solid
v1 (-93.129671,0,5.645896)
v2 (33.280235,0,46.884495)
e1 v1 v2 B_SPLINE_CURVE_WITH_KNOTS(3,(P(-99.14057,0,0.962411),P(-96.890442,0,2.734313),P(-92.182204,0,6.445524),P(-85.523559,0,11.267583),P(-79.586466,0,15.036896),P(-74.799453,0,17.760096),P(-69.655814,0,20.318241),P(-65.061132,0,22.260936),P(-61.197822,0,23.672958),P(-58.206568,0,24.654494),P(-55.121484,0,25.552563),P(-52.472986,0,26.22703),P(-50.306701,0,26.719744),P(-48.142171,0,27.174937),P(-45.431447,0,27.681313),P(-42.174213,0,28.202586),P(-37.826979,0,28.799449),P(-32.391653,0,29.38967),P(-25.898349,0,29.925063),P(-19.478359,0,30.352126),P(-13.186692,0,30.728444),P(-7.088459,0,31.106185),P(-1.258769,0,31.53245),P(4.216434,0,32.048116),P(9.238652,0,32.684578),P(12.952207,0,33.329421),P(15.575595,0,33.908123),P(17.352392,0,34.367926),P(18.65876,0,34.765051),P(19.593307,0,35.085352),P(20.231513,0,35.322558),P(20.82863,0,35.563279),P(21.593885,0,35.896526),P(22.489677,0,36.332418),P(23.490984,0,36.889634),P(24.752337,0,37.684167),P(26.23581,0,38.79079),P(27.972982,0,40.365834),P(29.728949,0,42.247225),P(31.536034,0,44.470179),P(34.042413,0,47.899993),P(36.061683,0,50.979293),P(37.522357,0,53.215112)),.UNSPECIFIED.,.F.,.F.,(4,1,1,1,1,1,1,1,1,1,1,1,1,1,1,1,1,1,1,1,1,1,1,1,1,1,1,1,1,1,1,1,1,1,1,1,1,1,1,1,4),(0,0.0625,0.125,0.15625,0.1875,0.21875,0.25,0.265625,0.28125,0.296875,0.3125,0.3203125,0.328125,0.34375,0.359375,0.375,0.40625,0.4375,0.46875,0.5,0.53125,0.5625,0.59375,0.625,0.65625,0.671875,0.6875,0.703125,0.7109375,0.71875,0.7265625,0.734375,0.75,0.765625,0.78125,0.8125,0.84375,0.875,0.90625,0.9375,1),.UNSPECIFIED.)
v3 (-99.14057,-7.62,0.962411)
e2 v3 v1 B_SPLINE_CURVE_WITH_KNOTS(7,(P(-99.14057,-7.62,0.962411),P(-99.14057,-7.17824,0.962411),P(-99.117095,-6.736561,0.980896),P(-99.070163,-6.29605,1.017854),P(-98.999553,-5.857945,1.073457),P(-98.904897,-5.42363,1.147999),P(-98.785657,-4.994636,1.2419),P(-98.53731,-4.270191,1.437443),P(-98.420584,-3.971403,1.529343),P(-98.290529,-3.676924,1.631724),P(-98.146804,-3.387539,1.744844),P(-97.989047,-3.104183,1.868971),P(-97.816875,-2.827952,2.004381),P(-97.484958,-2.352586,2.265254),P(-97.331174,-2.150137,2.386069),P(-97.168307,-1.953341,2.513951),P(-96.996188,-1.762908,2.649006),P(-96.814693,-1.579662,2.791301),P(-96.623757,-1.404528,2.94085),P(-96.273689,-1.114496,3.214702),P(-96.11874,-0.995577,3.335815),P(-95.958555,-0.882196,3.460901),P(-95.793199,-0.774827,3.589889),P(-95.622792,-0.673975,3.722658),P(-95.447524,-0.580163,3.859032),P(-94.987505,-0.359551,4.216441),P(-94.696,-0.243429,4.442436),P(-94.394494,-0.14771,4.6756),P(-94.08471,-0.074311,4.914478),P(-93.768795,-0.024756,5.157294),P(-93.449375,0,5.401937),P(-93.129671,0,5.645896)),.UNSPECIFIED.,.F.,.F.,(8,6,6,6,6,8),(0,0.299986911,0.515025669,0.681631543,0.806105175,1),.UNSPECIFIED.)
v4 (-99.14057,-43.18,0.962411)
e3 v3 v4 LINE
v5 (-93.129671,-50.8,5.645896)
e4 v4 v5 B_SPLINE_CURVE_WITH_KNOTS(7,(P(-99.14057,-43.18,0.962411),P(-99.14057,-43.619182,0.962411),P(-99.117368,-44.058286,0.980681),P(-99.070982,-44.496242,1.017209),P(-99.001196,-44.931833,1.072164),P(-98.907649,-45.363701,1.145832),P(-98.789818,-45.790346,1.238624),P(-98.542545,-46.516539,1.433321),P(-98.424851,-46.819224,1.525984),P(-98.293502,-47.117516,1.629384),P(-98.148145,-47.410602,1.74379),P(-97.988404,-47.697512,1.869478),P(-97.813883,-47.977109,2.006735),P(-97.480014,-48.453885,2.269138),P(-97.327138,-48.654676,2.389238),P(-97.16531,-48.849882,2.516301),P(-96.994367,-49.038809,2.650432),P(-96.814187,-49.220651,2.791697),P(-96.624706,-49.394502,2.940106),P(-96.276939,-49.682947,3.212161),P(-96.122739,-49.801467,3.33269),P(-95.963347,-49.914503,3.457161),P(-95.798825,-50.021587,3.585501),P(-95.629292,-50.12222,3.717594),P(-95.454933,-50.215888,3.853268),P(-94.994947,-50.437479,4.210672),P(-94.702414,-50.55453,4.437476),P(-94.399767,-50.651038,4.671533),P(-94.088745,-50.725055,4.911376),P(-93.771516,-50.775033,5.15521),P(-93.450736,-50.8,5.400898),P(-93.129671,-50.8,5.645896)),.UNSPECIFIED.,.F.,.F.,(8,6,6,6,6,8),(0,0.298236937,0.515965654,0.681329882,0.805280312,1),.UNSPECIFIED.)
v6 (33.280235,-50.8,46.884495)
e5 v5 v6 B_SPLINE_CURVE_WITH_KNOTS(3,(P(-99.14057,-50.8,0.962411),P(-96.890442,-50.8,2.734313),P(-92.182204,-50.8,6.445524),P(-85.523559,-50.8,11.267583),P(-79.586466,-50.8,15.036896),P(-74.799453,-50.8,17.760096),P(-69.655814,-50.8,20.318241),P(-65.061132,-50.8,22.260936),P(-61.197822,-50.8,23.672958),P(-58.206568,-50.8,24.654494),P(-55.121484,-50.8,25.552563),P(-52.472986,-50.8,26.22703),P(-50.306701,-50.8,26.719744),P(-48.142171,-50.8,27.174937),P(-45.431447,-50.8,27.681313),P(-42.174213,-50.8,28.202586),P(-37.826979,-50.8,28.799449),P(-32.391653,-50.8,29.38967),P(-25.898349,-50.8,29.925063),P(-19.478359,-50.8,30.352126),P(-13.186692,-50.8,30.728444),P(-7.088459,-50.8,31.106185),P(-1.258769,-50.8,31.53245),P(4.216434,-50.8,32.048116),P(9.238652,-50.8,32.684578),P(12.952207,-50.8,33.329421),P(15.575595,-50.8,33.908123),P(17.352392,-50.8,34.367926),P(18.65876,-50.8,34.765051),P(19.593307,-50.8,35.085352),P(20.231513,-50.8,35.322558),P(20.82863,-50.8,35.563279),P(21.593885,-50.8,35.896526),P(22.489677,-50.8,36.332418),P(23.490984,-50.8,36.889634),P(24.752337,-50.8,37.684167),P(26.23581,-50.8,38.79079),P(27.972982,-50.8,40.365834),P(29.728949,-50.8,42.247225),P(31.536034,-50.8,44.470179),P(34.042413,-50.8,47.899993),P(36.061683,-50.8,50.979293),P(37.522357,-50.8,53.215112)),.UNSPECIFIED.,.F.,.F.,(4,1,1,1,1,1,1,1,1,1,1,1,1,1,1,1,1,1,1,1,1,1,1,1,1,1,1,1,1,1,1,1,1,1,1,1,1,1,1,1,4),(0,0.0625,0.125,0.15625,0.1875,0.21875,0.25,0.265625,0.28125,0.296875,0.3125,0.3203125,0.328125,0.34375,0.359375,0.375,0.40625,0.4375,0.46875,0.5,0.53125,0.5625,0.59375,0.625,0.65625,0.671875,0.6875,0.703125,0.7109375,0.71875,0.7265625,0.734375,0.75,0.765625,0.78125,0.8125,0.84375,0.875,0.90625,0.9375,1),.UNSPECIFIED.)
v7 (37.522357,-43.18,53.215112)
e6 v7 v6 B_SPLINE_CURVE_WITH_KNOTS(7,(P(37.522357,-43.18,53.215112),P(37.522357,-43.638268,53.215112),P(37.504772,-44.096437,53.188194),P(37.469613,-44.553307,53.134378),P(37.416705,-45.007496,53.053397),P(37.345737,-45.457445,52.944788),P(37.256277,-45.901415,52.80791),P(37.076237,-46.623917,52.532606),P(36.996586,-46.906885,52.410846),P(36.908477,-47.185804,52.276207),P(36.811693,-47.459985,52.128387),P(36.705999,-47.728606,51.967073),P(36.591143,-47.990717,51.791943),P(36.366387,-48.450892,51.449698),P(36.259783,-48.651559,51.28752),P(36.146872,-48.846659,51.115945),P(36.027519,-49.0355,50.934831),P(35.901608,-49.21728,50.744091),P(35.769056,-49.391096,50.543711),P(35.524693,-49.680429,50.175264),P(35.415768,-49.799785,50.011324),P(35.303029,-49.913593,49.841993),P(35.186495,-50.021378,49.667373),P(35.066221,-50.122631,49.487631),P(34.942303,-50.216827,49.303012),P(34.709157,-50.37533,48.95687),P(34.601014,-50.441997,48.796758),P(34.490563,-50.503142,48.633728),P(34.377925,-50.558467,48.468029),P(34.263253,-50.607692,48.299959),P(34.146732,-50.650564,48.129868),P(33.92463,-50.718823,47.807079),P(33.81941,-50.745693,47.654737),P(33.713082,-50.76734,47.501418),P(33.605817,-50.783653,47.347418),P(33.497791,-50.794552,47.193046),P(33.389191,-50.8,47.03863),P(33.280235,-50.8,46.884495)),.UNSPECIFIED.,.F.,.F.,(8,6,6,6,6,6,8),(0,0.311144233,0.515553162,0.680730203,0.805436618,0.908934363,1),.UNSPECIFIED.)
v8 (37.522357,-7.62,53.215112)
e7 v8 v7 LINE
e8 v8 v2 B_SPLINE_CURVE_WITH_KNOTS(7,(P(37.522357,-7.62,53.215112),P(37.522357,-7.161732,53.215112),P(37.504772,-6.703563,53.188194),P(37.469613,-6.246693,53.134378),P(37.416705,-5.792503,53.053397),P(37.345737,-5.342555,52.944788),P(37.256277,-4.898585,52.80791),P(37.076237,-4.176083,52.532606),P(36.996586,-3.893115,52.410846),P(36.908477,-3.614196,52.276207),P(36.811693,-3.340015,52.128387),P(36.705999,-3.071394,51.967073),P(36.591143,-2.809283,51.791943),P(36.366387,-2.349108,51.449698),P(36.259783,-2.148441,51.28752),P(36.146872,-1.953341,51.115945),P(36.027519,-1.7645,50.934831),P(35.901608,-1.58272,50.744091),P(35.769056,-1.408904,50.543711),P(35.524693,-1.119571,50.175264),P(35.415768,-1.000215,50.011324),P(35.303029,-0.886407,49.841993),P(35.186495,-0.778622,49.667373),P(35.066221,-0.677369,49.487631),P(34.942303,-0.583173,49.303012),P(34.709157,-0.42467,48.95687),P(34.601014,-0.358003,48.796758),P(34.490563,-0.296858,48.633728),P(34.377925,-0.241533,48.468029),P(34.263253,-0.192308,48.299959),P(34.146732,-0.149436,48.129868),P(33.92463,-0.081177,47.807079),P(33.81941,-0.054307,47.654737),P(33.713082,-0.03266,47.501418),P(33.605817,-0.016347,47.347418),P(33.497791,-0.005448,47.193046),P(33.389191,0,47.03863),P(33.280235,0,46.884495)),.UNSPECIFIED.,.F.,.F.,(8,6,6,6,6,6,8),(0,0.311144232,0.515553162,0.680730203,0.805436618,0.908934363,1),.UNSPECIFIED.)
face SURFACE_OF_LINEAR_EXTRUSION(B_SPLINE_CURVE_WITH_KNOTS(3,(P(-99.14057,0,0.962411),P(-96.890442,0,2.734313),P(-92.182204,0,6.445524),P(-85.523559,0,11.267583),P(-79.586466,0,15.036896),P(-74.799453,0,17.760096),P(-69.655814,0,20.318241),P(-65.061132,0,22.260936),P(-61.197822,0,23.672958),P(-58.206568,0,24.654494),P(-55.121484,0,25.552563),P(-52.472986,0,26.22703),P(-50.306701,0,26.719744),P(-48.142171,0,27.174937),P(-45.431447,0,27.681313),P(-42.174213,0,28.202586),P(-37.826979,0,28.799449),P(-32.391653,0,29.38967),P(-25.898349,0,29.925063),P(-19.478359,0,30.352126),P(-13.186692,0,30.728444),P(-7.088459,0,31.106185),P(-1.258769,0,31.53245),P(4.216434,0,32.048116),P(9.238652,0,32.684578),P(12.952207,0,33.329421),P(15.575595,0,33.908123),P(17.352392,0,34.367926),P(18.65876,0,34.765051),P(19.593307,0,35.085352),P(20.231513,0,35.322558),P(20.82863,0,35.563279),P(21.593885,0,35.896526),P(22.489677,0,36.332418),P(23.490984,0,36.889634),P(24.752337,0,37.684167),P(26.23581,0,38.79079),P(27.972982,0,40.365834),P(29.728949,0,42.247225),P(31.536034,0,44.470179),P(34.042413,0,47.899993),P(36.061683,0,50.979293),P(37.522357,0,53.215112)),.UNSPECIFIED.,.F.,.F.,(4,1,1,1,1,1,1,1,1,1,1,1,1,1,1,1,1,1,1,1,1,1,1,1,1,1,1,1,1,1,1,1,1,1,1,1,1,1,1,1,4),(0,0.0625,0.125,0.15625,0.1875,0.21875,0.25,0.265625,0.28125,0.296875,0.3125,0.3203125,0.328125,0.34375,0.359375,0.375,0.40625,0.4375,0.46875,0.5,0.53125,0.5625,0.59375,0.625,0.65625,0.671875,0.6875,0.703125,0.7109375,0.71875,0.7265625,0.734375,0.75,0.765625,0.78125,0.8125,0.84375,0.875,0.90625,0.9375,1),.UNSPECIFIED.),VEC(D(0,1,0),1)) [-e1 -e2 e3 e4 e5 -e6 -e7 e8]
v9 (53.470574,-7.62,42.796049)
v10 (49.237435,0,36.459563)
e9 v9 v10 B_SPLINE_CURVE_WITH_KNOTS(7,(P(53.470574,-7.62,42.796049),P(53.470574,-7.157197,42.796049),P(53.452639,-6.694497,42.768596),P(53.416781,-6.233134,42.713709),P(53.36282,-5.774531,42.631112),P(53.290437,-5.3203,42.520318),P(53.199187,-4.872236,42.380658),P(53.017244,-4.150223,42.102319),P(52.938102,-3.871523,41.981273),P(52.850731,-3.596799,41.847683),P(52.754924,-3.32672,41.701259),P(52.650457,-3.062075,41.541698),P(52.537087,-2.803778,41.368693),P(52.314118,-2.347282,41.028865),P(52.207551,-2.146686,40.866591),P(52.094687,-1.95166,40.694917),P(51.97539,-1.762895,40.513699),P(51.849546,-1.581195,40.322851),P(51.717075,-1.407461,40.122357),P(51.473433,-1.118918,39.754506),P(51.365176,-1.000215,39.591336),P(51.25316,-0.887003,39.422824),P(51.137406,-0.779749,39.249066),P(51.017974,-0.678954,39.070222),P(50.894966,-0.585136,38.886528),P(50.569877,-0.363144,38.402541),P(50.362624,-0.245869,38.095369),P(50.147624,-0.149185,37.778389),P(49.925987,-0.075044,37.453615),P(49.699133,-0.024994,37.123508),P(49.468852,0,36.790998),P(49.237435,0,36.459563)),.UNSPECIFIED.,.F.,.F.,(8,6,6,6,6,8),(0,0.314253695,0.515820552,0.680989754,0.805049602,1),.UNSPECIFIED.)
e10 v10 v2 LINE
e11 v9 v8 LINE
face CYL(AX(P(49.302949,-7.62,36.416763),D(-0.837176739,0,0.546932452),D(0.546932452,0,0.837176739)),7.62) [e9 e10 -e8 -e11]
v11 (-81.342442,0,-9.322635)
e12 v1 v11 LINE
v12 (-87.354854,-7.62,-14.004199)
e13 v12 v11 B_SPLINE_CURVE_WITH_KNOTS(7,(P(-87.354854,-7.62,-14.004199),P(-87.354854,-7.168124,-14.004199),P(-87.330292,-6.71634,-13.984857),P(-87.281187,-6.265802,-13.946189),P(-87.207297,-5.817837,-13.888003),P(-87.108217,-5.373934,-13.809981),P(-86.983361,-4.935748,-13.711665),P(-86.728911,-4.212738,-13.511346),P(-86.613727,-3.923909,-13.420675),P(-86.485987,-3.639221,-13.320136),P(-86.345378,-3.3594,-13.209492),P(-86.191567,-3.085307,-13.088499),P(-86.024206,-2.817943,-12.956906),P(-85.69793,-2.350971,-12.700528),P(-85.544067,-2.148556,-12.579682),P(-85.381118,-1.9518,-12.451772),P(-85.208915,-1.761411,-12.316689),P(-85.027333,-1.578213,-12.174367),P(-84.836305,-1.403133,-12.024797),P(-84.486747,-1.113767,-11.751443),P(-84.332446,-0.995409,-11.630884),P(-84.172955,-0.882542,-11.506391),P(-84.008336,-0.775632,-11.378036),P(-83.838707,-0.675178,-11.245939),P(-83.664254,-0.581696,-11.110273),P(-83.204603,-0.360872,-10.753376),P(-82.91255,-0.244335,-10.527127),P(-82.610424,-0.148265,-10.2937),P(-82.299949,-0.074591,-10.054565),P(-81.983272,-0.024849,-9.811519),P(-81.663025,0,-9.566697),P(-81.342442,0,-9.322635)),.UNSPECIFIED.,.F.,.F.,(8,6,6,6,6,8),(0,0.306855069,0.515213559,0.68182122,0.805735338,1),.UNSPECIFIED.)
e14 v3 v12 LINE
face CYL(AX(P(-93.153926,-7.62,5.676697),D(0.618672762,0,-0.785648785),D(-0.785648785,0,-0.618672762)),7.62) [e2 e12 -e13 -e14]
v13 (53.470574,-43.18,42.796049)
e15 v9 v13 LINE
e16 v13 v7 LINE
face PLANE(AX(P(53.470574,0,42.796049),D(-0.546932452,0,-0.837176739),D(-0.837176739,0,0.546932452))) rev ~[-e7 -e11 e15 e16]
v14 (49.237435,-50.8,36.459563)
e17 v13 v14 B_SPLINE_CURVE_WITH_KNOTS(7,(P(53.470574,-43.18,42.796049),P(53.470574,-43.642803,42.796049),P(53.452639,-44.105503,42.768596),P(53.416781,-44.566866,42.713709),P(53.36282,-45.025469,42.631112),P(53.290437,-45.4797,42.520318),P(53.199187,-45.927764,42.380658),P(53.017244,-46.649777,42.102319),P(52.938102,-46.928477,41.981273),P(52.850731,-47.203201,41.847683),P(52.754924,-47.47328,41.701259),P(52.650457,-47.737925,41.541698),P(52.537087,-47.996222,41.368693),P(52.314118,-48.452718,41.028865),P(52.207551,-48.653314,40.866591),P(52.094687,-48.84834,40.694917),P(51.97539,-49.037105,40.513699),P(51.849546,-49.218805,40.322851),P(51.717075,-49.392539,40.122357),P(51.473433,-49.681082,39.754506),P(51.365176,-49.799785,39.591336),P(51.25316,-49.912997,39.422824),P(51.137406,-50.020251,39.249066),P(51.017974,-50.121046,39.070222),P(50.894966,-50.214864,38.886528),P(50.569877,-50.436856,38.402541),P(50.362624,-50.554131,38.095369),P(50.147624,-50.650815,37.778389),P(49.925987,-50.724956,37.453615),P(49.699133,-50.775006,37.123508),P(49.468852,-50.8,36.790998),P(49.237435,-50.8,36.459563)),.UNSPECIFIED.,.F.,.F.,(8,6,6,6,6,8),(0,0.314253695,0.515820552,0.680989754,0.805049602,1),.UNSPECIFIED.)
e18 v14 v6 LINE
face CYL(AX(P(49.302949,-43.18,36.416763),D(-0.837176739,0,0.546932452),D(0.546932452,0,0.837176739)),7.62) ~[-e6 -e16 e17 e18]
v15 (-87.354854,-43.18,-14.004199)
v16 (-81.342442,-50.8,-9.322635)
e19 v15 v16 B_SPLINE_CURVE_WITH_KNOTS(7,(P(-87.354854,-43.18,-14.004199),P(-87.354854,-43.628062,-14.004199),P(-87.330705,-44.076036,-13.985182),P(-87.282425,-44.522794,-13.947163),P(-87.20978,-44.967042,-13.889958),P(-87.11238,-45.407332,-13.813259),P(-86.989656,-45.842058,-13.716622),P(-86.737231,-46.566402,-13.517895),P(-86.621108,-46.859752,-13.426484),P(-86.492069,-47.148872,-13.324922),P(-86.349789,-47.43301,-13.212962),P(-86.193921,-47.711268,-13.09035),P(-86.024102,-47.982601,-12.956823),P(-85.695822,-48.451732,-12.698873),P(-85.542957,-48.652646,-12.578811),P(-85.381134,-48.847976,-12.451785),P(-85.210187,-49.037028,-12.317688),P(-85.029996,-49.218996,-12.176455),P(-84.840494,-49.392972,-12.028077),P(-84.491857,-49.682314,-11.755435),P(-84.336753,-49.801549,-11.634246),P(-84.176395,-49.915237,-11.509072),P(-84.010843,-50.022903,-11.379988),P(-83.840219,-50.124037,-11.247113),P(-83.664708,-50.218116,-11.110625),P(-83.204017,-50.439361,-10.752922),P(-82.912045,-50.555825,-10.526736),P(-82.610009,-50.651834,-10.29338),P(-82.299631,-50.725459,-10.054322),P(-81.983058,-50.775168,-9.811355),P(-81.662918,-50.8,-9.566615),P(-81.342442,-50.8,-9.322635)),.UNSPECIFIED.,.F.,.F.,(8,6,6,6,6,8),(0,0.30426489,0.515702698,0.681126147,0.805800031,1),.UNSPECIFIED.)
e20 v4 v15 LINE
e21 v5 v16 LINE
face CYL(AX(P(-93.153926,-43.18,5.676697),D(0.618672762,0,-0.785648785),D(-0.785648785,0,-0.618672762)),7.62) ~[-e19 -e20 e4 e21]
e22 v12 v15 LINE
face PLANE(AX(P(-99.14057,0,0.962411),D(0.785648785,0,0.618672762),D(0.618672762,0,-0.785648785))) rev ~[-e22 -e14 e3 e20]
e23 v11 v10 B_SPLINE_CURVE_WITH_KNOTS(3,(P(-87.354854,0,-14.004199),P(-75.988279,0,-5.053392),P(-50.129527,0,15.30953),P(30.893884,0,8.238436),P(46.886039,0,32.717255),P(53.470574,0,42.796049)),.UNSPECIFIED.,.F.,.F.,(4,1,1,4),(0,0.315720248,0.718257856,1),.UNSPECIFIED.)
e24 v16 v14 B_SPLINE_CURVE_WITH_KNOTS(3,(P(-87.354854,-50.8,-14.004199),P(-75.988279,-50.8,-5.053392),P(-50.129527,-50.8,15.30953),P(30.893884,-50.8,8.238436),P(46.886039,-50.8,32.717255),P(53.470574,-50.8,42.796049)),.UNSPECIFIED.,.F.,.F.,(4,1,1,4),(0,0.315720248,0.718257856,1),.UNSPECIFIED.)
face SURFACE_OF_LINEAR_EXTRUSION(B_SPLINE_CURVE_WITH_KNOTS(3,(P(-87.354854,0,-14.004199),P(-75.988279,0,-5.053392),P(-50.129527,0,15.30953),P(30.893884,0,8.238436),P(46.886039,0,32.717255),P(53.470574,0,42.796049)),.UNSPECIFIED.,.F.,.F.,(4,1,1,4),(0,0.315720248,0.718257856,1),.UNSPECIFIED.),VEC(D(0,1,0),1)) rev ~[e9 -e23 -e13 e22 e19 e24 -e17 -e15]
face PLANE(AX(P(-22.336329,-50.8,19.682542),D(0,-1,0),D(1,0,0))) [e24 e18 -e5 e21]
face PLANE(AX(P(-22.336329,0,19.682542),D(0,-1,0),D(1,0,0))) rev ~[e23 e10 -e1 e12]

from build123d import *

# Parameters (mm, degrees)
F1_DEPTH = 50.8
F2_R     = 7.62


# Not quite as in the source:
# - the dataset's text gives a spline's control points without its knots; the knots are read off the source's solid


with BuildPart() as f1:
    # F0 (on Front) → F1 (new body)
    with BuildSketch(Plane.XZ):
        with BuildLine():
            Line((-99.140569867, 0.9624105209), (-87.3548537493, -14.0041988343))
            add(Edge.make_bspline(
                [(-87.3548537493, -14.0041988343), (-75.988278967, -5.0533923801), (-50.1295268695, 15.3095304535), (30.893884095, 8.2384364656), (46.8860391937, 32.7172550289), (53.4705743194, 42.7960492671)],
                knots=[0, 0, 0, 0, 0.3157202484, 0.7182578563, 1, 1, 1, 1], degree=3))
            Line((53.4705743194, 42.7960492671), (37.5223574351, 53.2151124789))
            add(Edge.make_bspline(
                [(-99.140569867, 0.9624105209), (-96.8904420168, 2.7343127228), (-92.1822042841, 6.4455239555), (-85.5235588099, 11.2675833523), (-79.5864663, 15.0368959025), (-74.7994531697, 17.76009584), (-69.6558135521, 20.3182414285), (-65.0611322891, 22.2609359989), (-61.1978217529, 23.6729575033), (-58.2065681515, 24.6544942334), (-55.1214837936, 25.5525626666), (-52.4729857991, 26.2270304858), (-50.3067006534, 26.719744138), (-48.1421714357, 27.1749366825), (-45.4314468519, 27.6813125017), (-42.1742127519, 28.2025864044), (-37.8269791769, 28.7994489886), (-32.3916532491, 29.3896702982), (-25.8983489378, 29.9250625326), (-19.4783594472, 30.3521259056), (-13.18669172, 30.728444081), (-7.0884593281, 31.106185302), (-1.2587690845, 31.5324500009), (4.2164339577, 32.0481157479), (9.2386519552, 32.6845781763), (12.9522070386, 33.3294214338), (15.5755953046, 33.9081226339), (17.3523919076, 34.3679262028), (18.6587604495, 34.7650514573), (19.5933067855, 35.0853518104), (20.2315125197, 35.3225581279), (20.8286299659, 35.5632785947), (21.5938847658, 35.8965263385), (22.4896769447, 36.3324178593), (23.4909840998, 36.8896341285), (24.7523369479, 37.6841668244), (26.2358104686, 38.7907897037), (27.9729819139, 40.3658338924), (29.7289492605, 42.2472254179), (31.5360340689, 44.4701786628), (34.0424131946, 47.8999932909), (36.0616833593, 50.9792927623), (37.5223574351, 53.2151124789)],
                knots=[0, 0, 0, 0, 0.0625, 0.125, 0.15625, 0.1875, 0.21875, 0.25, 0.265625, 0.28125, 0.296875, 0.3125, 0.3203125, 0.328125, 0.34375, 0.359375, 0.375, 0.40625, 0.4375, 0.46875, 0.5, 0.53125, 0.5625, 0.59375, 0.625, 0.65625, 0.671875, 0.6875, 0.703125, 0.7109375, 0.71875, 0.7265625, 0.734375, 0.75, 0.765625, 0.78125, 0.8125, 0.84375, 0.875, 0.90625, 0.9375, 1, 1, 1, 1], degree=3))
        make_face()
    extrude(amount=F1_DEPTH)

    # F2
    f2_edges = [f1.edges().sort_by_distance(p)[0] for p in [
        (45.496466, -50.8, 48.005581),
        (-93.247712, -50.8, -6.520894),
        (-93.247712, 0, -6.520894),
        (45.496466, 0, 48.005581),
    ]]
    fillet(f2_edges, radius=F2_R)


solid = f1.part
